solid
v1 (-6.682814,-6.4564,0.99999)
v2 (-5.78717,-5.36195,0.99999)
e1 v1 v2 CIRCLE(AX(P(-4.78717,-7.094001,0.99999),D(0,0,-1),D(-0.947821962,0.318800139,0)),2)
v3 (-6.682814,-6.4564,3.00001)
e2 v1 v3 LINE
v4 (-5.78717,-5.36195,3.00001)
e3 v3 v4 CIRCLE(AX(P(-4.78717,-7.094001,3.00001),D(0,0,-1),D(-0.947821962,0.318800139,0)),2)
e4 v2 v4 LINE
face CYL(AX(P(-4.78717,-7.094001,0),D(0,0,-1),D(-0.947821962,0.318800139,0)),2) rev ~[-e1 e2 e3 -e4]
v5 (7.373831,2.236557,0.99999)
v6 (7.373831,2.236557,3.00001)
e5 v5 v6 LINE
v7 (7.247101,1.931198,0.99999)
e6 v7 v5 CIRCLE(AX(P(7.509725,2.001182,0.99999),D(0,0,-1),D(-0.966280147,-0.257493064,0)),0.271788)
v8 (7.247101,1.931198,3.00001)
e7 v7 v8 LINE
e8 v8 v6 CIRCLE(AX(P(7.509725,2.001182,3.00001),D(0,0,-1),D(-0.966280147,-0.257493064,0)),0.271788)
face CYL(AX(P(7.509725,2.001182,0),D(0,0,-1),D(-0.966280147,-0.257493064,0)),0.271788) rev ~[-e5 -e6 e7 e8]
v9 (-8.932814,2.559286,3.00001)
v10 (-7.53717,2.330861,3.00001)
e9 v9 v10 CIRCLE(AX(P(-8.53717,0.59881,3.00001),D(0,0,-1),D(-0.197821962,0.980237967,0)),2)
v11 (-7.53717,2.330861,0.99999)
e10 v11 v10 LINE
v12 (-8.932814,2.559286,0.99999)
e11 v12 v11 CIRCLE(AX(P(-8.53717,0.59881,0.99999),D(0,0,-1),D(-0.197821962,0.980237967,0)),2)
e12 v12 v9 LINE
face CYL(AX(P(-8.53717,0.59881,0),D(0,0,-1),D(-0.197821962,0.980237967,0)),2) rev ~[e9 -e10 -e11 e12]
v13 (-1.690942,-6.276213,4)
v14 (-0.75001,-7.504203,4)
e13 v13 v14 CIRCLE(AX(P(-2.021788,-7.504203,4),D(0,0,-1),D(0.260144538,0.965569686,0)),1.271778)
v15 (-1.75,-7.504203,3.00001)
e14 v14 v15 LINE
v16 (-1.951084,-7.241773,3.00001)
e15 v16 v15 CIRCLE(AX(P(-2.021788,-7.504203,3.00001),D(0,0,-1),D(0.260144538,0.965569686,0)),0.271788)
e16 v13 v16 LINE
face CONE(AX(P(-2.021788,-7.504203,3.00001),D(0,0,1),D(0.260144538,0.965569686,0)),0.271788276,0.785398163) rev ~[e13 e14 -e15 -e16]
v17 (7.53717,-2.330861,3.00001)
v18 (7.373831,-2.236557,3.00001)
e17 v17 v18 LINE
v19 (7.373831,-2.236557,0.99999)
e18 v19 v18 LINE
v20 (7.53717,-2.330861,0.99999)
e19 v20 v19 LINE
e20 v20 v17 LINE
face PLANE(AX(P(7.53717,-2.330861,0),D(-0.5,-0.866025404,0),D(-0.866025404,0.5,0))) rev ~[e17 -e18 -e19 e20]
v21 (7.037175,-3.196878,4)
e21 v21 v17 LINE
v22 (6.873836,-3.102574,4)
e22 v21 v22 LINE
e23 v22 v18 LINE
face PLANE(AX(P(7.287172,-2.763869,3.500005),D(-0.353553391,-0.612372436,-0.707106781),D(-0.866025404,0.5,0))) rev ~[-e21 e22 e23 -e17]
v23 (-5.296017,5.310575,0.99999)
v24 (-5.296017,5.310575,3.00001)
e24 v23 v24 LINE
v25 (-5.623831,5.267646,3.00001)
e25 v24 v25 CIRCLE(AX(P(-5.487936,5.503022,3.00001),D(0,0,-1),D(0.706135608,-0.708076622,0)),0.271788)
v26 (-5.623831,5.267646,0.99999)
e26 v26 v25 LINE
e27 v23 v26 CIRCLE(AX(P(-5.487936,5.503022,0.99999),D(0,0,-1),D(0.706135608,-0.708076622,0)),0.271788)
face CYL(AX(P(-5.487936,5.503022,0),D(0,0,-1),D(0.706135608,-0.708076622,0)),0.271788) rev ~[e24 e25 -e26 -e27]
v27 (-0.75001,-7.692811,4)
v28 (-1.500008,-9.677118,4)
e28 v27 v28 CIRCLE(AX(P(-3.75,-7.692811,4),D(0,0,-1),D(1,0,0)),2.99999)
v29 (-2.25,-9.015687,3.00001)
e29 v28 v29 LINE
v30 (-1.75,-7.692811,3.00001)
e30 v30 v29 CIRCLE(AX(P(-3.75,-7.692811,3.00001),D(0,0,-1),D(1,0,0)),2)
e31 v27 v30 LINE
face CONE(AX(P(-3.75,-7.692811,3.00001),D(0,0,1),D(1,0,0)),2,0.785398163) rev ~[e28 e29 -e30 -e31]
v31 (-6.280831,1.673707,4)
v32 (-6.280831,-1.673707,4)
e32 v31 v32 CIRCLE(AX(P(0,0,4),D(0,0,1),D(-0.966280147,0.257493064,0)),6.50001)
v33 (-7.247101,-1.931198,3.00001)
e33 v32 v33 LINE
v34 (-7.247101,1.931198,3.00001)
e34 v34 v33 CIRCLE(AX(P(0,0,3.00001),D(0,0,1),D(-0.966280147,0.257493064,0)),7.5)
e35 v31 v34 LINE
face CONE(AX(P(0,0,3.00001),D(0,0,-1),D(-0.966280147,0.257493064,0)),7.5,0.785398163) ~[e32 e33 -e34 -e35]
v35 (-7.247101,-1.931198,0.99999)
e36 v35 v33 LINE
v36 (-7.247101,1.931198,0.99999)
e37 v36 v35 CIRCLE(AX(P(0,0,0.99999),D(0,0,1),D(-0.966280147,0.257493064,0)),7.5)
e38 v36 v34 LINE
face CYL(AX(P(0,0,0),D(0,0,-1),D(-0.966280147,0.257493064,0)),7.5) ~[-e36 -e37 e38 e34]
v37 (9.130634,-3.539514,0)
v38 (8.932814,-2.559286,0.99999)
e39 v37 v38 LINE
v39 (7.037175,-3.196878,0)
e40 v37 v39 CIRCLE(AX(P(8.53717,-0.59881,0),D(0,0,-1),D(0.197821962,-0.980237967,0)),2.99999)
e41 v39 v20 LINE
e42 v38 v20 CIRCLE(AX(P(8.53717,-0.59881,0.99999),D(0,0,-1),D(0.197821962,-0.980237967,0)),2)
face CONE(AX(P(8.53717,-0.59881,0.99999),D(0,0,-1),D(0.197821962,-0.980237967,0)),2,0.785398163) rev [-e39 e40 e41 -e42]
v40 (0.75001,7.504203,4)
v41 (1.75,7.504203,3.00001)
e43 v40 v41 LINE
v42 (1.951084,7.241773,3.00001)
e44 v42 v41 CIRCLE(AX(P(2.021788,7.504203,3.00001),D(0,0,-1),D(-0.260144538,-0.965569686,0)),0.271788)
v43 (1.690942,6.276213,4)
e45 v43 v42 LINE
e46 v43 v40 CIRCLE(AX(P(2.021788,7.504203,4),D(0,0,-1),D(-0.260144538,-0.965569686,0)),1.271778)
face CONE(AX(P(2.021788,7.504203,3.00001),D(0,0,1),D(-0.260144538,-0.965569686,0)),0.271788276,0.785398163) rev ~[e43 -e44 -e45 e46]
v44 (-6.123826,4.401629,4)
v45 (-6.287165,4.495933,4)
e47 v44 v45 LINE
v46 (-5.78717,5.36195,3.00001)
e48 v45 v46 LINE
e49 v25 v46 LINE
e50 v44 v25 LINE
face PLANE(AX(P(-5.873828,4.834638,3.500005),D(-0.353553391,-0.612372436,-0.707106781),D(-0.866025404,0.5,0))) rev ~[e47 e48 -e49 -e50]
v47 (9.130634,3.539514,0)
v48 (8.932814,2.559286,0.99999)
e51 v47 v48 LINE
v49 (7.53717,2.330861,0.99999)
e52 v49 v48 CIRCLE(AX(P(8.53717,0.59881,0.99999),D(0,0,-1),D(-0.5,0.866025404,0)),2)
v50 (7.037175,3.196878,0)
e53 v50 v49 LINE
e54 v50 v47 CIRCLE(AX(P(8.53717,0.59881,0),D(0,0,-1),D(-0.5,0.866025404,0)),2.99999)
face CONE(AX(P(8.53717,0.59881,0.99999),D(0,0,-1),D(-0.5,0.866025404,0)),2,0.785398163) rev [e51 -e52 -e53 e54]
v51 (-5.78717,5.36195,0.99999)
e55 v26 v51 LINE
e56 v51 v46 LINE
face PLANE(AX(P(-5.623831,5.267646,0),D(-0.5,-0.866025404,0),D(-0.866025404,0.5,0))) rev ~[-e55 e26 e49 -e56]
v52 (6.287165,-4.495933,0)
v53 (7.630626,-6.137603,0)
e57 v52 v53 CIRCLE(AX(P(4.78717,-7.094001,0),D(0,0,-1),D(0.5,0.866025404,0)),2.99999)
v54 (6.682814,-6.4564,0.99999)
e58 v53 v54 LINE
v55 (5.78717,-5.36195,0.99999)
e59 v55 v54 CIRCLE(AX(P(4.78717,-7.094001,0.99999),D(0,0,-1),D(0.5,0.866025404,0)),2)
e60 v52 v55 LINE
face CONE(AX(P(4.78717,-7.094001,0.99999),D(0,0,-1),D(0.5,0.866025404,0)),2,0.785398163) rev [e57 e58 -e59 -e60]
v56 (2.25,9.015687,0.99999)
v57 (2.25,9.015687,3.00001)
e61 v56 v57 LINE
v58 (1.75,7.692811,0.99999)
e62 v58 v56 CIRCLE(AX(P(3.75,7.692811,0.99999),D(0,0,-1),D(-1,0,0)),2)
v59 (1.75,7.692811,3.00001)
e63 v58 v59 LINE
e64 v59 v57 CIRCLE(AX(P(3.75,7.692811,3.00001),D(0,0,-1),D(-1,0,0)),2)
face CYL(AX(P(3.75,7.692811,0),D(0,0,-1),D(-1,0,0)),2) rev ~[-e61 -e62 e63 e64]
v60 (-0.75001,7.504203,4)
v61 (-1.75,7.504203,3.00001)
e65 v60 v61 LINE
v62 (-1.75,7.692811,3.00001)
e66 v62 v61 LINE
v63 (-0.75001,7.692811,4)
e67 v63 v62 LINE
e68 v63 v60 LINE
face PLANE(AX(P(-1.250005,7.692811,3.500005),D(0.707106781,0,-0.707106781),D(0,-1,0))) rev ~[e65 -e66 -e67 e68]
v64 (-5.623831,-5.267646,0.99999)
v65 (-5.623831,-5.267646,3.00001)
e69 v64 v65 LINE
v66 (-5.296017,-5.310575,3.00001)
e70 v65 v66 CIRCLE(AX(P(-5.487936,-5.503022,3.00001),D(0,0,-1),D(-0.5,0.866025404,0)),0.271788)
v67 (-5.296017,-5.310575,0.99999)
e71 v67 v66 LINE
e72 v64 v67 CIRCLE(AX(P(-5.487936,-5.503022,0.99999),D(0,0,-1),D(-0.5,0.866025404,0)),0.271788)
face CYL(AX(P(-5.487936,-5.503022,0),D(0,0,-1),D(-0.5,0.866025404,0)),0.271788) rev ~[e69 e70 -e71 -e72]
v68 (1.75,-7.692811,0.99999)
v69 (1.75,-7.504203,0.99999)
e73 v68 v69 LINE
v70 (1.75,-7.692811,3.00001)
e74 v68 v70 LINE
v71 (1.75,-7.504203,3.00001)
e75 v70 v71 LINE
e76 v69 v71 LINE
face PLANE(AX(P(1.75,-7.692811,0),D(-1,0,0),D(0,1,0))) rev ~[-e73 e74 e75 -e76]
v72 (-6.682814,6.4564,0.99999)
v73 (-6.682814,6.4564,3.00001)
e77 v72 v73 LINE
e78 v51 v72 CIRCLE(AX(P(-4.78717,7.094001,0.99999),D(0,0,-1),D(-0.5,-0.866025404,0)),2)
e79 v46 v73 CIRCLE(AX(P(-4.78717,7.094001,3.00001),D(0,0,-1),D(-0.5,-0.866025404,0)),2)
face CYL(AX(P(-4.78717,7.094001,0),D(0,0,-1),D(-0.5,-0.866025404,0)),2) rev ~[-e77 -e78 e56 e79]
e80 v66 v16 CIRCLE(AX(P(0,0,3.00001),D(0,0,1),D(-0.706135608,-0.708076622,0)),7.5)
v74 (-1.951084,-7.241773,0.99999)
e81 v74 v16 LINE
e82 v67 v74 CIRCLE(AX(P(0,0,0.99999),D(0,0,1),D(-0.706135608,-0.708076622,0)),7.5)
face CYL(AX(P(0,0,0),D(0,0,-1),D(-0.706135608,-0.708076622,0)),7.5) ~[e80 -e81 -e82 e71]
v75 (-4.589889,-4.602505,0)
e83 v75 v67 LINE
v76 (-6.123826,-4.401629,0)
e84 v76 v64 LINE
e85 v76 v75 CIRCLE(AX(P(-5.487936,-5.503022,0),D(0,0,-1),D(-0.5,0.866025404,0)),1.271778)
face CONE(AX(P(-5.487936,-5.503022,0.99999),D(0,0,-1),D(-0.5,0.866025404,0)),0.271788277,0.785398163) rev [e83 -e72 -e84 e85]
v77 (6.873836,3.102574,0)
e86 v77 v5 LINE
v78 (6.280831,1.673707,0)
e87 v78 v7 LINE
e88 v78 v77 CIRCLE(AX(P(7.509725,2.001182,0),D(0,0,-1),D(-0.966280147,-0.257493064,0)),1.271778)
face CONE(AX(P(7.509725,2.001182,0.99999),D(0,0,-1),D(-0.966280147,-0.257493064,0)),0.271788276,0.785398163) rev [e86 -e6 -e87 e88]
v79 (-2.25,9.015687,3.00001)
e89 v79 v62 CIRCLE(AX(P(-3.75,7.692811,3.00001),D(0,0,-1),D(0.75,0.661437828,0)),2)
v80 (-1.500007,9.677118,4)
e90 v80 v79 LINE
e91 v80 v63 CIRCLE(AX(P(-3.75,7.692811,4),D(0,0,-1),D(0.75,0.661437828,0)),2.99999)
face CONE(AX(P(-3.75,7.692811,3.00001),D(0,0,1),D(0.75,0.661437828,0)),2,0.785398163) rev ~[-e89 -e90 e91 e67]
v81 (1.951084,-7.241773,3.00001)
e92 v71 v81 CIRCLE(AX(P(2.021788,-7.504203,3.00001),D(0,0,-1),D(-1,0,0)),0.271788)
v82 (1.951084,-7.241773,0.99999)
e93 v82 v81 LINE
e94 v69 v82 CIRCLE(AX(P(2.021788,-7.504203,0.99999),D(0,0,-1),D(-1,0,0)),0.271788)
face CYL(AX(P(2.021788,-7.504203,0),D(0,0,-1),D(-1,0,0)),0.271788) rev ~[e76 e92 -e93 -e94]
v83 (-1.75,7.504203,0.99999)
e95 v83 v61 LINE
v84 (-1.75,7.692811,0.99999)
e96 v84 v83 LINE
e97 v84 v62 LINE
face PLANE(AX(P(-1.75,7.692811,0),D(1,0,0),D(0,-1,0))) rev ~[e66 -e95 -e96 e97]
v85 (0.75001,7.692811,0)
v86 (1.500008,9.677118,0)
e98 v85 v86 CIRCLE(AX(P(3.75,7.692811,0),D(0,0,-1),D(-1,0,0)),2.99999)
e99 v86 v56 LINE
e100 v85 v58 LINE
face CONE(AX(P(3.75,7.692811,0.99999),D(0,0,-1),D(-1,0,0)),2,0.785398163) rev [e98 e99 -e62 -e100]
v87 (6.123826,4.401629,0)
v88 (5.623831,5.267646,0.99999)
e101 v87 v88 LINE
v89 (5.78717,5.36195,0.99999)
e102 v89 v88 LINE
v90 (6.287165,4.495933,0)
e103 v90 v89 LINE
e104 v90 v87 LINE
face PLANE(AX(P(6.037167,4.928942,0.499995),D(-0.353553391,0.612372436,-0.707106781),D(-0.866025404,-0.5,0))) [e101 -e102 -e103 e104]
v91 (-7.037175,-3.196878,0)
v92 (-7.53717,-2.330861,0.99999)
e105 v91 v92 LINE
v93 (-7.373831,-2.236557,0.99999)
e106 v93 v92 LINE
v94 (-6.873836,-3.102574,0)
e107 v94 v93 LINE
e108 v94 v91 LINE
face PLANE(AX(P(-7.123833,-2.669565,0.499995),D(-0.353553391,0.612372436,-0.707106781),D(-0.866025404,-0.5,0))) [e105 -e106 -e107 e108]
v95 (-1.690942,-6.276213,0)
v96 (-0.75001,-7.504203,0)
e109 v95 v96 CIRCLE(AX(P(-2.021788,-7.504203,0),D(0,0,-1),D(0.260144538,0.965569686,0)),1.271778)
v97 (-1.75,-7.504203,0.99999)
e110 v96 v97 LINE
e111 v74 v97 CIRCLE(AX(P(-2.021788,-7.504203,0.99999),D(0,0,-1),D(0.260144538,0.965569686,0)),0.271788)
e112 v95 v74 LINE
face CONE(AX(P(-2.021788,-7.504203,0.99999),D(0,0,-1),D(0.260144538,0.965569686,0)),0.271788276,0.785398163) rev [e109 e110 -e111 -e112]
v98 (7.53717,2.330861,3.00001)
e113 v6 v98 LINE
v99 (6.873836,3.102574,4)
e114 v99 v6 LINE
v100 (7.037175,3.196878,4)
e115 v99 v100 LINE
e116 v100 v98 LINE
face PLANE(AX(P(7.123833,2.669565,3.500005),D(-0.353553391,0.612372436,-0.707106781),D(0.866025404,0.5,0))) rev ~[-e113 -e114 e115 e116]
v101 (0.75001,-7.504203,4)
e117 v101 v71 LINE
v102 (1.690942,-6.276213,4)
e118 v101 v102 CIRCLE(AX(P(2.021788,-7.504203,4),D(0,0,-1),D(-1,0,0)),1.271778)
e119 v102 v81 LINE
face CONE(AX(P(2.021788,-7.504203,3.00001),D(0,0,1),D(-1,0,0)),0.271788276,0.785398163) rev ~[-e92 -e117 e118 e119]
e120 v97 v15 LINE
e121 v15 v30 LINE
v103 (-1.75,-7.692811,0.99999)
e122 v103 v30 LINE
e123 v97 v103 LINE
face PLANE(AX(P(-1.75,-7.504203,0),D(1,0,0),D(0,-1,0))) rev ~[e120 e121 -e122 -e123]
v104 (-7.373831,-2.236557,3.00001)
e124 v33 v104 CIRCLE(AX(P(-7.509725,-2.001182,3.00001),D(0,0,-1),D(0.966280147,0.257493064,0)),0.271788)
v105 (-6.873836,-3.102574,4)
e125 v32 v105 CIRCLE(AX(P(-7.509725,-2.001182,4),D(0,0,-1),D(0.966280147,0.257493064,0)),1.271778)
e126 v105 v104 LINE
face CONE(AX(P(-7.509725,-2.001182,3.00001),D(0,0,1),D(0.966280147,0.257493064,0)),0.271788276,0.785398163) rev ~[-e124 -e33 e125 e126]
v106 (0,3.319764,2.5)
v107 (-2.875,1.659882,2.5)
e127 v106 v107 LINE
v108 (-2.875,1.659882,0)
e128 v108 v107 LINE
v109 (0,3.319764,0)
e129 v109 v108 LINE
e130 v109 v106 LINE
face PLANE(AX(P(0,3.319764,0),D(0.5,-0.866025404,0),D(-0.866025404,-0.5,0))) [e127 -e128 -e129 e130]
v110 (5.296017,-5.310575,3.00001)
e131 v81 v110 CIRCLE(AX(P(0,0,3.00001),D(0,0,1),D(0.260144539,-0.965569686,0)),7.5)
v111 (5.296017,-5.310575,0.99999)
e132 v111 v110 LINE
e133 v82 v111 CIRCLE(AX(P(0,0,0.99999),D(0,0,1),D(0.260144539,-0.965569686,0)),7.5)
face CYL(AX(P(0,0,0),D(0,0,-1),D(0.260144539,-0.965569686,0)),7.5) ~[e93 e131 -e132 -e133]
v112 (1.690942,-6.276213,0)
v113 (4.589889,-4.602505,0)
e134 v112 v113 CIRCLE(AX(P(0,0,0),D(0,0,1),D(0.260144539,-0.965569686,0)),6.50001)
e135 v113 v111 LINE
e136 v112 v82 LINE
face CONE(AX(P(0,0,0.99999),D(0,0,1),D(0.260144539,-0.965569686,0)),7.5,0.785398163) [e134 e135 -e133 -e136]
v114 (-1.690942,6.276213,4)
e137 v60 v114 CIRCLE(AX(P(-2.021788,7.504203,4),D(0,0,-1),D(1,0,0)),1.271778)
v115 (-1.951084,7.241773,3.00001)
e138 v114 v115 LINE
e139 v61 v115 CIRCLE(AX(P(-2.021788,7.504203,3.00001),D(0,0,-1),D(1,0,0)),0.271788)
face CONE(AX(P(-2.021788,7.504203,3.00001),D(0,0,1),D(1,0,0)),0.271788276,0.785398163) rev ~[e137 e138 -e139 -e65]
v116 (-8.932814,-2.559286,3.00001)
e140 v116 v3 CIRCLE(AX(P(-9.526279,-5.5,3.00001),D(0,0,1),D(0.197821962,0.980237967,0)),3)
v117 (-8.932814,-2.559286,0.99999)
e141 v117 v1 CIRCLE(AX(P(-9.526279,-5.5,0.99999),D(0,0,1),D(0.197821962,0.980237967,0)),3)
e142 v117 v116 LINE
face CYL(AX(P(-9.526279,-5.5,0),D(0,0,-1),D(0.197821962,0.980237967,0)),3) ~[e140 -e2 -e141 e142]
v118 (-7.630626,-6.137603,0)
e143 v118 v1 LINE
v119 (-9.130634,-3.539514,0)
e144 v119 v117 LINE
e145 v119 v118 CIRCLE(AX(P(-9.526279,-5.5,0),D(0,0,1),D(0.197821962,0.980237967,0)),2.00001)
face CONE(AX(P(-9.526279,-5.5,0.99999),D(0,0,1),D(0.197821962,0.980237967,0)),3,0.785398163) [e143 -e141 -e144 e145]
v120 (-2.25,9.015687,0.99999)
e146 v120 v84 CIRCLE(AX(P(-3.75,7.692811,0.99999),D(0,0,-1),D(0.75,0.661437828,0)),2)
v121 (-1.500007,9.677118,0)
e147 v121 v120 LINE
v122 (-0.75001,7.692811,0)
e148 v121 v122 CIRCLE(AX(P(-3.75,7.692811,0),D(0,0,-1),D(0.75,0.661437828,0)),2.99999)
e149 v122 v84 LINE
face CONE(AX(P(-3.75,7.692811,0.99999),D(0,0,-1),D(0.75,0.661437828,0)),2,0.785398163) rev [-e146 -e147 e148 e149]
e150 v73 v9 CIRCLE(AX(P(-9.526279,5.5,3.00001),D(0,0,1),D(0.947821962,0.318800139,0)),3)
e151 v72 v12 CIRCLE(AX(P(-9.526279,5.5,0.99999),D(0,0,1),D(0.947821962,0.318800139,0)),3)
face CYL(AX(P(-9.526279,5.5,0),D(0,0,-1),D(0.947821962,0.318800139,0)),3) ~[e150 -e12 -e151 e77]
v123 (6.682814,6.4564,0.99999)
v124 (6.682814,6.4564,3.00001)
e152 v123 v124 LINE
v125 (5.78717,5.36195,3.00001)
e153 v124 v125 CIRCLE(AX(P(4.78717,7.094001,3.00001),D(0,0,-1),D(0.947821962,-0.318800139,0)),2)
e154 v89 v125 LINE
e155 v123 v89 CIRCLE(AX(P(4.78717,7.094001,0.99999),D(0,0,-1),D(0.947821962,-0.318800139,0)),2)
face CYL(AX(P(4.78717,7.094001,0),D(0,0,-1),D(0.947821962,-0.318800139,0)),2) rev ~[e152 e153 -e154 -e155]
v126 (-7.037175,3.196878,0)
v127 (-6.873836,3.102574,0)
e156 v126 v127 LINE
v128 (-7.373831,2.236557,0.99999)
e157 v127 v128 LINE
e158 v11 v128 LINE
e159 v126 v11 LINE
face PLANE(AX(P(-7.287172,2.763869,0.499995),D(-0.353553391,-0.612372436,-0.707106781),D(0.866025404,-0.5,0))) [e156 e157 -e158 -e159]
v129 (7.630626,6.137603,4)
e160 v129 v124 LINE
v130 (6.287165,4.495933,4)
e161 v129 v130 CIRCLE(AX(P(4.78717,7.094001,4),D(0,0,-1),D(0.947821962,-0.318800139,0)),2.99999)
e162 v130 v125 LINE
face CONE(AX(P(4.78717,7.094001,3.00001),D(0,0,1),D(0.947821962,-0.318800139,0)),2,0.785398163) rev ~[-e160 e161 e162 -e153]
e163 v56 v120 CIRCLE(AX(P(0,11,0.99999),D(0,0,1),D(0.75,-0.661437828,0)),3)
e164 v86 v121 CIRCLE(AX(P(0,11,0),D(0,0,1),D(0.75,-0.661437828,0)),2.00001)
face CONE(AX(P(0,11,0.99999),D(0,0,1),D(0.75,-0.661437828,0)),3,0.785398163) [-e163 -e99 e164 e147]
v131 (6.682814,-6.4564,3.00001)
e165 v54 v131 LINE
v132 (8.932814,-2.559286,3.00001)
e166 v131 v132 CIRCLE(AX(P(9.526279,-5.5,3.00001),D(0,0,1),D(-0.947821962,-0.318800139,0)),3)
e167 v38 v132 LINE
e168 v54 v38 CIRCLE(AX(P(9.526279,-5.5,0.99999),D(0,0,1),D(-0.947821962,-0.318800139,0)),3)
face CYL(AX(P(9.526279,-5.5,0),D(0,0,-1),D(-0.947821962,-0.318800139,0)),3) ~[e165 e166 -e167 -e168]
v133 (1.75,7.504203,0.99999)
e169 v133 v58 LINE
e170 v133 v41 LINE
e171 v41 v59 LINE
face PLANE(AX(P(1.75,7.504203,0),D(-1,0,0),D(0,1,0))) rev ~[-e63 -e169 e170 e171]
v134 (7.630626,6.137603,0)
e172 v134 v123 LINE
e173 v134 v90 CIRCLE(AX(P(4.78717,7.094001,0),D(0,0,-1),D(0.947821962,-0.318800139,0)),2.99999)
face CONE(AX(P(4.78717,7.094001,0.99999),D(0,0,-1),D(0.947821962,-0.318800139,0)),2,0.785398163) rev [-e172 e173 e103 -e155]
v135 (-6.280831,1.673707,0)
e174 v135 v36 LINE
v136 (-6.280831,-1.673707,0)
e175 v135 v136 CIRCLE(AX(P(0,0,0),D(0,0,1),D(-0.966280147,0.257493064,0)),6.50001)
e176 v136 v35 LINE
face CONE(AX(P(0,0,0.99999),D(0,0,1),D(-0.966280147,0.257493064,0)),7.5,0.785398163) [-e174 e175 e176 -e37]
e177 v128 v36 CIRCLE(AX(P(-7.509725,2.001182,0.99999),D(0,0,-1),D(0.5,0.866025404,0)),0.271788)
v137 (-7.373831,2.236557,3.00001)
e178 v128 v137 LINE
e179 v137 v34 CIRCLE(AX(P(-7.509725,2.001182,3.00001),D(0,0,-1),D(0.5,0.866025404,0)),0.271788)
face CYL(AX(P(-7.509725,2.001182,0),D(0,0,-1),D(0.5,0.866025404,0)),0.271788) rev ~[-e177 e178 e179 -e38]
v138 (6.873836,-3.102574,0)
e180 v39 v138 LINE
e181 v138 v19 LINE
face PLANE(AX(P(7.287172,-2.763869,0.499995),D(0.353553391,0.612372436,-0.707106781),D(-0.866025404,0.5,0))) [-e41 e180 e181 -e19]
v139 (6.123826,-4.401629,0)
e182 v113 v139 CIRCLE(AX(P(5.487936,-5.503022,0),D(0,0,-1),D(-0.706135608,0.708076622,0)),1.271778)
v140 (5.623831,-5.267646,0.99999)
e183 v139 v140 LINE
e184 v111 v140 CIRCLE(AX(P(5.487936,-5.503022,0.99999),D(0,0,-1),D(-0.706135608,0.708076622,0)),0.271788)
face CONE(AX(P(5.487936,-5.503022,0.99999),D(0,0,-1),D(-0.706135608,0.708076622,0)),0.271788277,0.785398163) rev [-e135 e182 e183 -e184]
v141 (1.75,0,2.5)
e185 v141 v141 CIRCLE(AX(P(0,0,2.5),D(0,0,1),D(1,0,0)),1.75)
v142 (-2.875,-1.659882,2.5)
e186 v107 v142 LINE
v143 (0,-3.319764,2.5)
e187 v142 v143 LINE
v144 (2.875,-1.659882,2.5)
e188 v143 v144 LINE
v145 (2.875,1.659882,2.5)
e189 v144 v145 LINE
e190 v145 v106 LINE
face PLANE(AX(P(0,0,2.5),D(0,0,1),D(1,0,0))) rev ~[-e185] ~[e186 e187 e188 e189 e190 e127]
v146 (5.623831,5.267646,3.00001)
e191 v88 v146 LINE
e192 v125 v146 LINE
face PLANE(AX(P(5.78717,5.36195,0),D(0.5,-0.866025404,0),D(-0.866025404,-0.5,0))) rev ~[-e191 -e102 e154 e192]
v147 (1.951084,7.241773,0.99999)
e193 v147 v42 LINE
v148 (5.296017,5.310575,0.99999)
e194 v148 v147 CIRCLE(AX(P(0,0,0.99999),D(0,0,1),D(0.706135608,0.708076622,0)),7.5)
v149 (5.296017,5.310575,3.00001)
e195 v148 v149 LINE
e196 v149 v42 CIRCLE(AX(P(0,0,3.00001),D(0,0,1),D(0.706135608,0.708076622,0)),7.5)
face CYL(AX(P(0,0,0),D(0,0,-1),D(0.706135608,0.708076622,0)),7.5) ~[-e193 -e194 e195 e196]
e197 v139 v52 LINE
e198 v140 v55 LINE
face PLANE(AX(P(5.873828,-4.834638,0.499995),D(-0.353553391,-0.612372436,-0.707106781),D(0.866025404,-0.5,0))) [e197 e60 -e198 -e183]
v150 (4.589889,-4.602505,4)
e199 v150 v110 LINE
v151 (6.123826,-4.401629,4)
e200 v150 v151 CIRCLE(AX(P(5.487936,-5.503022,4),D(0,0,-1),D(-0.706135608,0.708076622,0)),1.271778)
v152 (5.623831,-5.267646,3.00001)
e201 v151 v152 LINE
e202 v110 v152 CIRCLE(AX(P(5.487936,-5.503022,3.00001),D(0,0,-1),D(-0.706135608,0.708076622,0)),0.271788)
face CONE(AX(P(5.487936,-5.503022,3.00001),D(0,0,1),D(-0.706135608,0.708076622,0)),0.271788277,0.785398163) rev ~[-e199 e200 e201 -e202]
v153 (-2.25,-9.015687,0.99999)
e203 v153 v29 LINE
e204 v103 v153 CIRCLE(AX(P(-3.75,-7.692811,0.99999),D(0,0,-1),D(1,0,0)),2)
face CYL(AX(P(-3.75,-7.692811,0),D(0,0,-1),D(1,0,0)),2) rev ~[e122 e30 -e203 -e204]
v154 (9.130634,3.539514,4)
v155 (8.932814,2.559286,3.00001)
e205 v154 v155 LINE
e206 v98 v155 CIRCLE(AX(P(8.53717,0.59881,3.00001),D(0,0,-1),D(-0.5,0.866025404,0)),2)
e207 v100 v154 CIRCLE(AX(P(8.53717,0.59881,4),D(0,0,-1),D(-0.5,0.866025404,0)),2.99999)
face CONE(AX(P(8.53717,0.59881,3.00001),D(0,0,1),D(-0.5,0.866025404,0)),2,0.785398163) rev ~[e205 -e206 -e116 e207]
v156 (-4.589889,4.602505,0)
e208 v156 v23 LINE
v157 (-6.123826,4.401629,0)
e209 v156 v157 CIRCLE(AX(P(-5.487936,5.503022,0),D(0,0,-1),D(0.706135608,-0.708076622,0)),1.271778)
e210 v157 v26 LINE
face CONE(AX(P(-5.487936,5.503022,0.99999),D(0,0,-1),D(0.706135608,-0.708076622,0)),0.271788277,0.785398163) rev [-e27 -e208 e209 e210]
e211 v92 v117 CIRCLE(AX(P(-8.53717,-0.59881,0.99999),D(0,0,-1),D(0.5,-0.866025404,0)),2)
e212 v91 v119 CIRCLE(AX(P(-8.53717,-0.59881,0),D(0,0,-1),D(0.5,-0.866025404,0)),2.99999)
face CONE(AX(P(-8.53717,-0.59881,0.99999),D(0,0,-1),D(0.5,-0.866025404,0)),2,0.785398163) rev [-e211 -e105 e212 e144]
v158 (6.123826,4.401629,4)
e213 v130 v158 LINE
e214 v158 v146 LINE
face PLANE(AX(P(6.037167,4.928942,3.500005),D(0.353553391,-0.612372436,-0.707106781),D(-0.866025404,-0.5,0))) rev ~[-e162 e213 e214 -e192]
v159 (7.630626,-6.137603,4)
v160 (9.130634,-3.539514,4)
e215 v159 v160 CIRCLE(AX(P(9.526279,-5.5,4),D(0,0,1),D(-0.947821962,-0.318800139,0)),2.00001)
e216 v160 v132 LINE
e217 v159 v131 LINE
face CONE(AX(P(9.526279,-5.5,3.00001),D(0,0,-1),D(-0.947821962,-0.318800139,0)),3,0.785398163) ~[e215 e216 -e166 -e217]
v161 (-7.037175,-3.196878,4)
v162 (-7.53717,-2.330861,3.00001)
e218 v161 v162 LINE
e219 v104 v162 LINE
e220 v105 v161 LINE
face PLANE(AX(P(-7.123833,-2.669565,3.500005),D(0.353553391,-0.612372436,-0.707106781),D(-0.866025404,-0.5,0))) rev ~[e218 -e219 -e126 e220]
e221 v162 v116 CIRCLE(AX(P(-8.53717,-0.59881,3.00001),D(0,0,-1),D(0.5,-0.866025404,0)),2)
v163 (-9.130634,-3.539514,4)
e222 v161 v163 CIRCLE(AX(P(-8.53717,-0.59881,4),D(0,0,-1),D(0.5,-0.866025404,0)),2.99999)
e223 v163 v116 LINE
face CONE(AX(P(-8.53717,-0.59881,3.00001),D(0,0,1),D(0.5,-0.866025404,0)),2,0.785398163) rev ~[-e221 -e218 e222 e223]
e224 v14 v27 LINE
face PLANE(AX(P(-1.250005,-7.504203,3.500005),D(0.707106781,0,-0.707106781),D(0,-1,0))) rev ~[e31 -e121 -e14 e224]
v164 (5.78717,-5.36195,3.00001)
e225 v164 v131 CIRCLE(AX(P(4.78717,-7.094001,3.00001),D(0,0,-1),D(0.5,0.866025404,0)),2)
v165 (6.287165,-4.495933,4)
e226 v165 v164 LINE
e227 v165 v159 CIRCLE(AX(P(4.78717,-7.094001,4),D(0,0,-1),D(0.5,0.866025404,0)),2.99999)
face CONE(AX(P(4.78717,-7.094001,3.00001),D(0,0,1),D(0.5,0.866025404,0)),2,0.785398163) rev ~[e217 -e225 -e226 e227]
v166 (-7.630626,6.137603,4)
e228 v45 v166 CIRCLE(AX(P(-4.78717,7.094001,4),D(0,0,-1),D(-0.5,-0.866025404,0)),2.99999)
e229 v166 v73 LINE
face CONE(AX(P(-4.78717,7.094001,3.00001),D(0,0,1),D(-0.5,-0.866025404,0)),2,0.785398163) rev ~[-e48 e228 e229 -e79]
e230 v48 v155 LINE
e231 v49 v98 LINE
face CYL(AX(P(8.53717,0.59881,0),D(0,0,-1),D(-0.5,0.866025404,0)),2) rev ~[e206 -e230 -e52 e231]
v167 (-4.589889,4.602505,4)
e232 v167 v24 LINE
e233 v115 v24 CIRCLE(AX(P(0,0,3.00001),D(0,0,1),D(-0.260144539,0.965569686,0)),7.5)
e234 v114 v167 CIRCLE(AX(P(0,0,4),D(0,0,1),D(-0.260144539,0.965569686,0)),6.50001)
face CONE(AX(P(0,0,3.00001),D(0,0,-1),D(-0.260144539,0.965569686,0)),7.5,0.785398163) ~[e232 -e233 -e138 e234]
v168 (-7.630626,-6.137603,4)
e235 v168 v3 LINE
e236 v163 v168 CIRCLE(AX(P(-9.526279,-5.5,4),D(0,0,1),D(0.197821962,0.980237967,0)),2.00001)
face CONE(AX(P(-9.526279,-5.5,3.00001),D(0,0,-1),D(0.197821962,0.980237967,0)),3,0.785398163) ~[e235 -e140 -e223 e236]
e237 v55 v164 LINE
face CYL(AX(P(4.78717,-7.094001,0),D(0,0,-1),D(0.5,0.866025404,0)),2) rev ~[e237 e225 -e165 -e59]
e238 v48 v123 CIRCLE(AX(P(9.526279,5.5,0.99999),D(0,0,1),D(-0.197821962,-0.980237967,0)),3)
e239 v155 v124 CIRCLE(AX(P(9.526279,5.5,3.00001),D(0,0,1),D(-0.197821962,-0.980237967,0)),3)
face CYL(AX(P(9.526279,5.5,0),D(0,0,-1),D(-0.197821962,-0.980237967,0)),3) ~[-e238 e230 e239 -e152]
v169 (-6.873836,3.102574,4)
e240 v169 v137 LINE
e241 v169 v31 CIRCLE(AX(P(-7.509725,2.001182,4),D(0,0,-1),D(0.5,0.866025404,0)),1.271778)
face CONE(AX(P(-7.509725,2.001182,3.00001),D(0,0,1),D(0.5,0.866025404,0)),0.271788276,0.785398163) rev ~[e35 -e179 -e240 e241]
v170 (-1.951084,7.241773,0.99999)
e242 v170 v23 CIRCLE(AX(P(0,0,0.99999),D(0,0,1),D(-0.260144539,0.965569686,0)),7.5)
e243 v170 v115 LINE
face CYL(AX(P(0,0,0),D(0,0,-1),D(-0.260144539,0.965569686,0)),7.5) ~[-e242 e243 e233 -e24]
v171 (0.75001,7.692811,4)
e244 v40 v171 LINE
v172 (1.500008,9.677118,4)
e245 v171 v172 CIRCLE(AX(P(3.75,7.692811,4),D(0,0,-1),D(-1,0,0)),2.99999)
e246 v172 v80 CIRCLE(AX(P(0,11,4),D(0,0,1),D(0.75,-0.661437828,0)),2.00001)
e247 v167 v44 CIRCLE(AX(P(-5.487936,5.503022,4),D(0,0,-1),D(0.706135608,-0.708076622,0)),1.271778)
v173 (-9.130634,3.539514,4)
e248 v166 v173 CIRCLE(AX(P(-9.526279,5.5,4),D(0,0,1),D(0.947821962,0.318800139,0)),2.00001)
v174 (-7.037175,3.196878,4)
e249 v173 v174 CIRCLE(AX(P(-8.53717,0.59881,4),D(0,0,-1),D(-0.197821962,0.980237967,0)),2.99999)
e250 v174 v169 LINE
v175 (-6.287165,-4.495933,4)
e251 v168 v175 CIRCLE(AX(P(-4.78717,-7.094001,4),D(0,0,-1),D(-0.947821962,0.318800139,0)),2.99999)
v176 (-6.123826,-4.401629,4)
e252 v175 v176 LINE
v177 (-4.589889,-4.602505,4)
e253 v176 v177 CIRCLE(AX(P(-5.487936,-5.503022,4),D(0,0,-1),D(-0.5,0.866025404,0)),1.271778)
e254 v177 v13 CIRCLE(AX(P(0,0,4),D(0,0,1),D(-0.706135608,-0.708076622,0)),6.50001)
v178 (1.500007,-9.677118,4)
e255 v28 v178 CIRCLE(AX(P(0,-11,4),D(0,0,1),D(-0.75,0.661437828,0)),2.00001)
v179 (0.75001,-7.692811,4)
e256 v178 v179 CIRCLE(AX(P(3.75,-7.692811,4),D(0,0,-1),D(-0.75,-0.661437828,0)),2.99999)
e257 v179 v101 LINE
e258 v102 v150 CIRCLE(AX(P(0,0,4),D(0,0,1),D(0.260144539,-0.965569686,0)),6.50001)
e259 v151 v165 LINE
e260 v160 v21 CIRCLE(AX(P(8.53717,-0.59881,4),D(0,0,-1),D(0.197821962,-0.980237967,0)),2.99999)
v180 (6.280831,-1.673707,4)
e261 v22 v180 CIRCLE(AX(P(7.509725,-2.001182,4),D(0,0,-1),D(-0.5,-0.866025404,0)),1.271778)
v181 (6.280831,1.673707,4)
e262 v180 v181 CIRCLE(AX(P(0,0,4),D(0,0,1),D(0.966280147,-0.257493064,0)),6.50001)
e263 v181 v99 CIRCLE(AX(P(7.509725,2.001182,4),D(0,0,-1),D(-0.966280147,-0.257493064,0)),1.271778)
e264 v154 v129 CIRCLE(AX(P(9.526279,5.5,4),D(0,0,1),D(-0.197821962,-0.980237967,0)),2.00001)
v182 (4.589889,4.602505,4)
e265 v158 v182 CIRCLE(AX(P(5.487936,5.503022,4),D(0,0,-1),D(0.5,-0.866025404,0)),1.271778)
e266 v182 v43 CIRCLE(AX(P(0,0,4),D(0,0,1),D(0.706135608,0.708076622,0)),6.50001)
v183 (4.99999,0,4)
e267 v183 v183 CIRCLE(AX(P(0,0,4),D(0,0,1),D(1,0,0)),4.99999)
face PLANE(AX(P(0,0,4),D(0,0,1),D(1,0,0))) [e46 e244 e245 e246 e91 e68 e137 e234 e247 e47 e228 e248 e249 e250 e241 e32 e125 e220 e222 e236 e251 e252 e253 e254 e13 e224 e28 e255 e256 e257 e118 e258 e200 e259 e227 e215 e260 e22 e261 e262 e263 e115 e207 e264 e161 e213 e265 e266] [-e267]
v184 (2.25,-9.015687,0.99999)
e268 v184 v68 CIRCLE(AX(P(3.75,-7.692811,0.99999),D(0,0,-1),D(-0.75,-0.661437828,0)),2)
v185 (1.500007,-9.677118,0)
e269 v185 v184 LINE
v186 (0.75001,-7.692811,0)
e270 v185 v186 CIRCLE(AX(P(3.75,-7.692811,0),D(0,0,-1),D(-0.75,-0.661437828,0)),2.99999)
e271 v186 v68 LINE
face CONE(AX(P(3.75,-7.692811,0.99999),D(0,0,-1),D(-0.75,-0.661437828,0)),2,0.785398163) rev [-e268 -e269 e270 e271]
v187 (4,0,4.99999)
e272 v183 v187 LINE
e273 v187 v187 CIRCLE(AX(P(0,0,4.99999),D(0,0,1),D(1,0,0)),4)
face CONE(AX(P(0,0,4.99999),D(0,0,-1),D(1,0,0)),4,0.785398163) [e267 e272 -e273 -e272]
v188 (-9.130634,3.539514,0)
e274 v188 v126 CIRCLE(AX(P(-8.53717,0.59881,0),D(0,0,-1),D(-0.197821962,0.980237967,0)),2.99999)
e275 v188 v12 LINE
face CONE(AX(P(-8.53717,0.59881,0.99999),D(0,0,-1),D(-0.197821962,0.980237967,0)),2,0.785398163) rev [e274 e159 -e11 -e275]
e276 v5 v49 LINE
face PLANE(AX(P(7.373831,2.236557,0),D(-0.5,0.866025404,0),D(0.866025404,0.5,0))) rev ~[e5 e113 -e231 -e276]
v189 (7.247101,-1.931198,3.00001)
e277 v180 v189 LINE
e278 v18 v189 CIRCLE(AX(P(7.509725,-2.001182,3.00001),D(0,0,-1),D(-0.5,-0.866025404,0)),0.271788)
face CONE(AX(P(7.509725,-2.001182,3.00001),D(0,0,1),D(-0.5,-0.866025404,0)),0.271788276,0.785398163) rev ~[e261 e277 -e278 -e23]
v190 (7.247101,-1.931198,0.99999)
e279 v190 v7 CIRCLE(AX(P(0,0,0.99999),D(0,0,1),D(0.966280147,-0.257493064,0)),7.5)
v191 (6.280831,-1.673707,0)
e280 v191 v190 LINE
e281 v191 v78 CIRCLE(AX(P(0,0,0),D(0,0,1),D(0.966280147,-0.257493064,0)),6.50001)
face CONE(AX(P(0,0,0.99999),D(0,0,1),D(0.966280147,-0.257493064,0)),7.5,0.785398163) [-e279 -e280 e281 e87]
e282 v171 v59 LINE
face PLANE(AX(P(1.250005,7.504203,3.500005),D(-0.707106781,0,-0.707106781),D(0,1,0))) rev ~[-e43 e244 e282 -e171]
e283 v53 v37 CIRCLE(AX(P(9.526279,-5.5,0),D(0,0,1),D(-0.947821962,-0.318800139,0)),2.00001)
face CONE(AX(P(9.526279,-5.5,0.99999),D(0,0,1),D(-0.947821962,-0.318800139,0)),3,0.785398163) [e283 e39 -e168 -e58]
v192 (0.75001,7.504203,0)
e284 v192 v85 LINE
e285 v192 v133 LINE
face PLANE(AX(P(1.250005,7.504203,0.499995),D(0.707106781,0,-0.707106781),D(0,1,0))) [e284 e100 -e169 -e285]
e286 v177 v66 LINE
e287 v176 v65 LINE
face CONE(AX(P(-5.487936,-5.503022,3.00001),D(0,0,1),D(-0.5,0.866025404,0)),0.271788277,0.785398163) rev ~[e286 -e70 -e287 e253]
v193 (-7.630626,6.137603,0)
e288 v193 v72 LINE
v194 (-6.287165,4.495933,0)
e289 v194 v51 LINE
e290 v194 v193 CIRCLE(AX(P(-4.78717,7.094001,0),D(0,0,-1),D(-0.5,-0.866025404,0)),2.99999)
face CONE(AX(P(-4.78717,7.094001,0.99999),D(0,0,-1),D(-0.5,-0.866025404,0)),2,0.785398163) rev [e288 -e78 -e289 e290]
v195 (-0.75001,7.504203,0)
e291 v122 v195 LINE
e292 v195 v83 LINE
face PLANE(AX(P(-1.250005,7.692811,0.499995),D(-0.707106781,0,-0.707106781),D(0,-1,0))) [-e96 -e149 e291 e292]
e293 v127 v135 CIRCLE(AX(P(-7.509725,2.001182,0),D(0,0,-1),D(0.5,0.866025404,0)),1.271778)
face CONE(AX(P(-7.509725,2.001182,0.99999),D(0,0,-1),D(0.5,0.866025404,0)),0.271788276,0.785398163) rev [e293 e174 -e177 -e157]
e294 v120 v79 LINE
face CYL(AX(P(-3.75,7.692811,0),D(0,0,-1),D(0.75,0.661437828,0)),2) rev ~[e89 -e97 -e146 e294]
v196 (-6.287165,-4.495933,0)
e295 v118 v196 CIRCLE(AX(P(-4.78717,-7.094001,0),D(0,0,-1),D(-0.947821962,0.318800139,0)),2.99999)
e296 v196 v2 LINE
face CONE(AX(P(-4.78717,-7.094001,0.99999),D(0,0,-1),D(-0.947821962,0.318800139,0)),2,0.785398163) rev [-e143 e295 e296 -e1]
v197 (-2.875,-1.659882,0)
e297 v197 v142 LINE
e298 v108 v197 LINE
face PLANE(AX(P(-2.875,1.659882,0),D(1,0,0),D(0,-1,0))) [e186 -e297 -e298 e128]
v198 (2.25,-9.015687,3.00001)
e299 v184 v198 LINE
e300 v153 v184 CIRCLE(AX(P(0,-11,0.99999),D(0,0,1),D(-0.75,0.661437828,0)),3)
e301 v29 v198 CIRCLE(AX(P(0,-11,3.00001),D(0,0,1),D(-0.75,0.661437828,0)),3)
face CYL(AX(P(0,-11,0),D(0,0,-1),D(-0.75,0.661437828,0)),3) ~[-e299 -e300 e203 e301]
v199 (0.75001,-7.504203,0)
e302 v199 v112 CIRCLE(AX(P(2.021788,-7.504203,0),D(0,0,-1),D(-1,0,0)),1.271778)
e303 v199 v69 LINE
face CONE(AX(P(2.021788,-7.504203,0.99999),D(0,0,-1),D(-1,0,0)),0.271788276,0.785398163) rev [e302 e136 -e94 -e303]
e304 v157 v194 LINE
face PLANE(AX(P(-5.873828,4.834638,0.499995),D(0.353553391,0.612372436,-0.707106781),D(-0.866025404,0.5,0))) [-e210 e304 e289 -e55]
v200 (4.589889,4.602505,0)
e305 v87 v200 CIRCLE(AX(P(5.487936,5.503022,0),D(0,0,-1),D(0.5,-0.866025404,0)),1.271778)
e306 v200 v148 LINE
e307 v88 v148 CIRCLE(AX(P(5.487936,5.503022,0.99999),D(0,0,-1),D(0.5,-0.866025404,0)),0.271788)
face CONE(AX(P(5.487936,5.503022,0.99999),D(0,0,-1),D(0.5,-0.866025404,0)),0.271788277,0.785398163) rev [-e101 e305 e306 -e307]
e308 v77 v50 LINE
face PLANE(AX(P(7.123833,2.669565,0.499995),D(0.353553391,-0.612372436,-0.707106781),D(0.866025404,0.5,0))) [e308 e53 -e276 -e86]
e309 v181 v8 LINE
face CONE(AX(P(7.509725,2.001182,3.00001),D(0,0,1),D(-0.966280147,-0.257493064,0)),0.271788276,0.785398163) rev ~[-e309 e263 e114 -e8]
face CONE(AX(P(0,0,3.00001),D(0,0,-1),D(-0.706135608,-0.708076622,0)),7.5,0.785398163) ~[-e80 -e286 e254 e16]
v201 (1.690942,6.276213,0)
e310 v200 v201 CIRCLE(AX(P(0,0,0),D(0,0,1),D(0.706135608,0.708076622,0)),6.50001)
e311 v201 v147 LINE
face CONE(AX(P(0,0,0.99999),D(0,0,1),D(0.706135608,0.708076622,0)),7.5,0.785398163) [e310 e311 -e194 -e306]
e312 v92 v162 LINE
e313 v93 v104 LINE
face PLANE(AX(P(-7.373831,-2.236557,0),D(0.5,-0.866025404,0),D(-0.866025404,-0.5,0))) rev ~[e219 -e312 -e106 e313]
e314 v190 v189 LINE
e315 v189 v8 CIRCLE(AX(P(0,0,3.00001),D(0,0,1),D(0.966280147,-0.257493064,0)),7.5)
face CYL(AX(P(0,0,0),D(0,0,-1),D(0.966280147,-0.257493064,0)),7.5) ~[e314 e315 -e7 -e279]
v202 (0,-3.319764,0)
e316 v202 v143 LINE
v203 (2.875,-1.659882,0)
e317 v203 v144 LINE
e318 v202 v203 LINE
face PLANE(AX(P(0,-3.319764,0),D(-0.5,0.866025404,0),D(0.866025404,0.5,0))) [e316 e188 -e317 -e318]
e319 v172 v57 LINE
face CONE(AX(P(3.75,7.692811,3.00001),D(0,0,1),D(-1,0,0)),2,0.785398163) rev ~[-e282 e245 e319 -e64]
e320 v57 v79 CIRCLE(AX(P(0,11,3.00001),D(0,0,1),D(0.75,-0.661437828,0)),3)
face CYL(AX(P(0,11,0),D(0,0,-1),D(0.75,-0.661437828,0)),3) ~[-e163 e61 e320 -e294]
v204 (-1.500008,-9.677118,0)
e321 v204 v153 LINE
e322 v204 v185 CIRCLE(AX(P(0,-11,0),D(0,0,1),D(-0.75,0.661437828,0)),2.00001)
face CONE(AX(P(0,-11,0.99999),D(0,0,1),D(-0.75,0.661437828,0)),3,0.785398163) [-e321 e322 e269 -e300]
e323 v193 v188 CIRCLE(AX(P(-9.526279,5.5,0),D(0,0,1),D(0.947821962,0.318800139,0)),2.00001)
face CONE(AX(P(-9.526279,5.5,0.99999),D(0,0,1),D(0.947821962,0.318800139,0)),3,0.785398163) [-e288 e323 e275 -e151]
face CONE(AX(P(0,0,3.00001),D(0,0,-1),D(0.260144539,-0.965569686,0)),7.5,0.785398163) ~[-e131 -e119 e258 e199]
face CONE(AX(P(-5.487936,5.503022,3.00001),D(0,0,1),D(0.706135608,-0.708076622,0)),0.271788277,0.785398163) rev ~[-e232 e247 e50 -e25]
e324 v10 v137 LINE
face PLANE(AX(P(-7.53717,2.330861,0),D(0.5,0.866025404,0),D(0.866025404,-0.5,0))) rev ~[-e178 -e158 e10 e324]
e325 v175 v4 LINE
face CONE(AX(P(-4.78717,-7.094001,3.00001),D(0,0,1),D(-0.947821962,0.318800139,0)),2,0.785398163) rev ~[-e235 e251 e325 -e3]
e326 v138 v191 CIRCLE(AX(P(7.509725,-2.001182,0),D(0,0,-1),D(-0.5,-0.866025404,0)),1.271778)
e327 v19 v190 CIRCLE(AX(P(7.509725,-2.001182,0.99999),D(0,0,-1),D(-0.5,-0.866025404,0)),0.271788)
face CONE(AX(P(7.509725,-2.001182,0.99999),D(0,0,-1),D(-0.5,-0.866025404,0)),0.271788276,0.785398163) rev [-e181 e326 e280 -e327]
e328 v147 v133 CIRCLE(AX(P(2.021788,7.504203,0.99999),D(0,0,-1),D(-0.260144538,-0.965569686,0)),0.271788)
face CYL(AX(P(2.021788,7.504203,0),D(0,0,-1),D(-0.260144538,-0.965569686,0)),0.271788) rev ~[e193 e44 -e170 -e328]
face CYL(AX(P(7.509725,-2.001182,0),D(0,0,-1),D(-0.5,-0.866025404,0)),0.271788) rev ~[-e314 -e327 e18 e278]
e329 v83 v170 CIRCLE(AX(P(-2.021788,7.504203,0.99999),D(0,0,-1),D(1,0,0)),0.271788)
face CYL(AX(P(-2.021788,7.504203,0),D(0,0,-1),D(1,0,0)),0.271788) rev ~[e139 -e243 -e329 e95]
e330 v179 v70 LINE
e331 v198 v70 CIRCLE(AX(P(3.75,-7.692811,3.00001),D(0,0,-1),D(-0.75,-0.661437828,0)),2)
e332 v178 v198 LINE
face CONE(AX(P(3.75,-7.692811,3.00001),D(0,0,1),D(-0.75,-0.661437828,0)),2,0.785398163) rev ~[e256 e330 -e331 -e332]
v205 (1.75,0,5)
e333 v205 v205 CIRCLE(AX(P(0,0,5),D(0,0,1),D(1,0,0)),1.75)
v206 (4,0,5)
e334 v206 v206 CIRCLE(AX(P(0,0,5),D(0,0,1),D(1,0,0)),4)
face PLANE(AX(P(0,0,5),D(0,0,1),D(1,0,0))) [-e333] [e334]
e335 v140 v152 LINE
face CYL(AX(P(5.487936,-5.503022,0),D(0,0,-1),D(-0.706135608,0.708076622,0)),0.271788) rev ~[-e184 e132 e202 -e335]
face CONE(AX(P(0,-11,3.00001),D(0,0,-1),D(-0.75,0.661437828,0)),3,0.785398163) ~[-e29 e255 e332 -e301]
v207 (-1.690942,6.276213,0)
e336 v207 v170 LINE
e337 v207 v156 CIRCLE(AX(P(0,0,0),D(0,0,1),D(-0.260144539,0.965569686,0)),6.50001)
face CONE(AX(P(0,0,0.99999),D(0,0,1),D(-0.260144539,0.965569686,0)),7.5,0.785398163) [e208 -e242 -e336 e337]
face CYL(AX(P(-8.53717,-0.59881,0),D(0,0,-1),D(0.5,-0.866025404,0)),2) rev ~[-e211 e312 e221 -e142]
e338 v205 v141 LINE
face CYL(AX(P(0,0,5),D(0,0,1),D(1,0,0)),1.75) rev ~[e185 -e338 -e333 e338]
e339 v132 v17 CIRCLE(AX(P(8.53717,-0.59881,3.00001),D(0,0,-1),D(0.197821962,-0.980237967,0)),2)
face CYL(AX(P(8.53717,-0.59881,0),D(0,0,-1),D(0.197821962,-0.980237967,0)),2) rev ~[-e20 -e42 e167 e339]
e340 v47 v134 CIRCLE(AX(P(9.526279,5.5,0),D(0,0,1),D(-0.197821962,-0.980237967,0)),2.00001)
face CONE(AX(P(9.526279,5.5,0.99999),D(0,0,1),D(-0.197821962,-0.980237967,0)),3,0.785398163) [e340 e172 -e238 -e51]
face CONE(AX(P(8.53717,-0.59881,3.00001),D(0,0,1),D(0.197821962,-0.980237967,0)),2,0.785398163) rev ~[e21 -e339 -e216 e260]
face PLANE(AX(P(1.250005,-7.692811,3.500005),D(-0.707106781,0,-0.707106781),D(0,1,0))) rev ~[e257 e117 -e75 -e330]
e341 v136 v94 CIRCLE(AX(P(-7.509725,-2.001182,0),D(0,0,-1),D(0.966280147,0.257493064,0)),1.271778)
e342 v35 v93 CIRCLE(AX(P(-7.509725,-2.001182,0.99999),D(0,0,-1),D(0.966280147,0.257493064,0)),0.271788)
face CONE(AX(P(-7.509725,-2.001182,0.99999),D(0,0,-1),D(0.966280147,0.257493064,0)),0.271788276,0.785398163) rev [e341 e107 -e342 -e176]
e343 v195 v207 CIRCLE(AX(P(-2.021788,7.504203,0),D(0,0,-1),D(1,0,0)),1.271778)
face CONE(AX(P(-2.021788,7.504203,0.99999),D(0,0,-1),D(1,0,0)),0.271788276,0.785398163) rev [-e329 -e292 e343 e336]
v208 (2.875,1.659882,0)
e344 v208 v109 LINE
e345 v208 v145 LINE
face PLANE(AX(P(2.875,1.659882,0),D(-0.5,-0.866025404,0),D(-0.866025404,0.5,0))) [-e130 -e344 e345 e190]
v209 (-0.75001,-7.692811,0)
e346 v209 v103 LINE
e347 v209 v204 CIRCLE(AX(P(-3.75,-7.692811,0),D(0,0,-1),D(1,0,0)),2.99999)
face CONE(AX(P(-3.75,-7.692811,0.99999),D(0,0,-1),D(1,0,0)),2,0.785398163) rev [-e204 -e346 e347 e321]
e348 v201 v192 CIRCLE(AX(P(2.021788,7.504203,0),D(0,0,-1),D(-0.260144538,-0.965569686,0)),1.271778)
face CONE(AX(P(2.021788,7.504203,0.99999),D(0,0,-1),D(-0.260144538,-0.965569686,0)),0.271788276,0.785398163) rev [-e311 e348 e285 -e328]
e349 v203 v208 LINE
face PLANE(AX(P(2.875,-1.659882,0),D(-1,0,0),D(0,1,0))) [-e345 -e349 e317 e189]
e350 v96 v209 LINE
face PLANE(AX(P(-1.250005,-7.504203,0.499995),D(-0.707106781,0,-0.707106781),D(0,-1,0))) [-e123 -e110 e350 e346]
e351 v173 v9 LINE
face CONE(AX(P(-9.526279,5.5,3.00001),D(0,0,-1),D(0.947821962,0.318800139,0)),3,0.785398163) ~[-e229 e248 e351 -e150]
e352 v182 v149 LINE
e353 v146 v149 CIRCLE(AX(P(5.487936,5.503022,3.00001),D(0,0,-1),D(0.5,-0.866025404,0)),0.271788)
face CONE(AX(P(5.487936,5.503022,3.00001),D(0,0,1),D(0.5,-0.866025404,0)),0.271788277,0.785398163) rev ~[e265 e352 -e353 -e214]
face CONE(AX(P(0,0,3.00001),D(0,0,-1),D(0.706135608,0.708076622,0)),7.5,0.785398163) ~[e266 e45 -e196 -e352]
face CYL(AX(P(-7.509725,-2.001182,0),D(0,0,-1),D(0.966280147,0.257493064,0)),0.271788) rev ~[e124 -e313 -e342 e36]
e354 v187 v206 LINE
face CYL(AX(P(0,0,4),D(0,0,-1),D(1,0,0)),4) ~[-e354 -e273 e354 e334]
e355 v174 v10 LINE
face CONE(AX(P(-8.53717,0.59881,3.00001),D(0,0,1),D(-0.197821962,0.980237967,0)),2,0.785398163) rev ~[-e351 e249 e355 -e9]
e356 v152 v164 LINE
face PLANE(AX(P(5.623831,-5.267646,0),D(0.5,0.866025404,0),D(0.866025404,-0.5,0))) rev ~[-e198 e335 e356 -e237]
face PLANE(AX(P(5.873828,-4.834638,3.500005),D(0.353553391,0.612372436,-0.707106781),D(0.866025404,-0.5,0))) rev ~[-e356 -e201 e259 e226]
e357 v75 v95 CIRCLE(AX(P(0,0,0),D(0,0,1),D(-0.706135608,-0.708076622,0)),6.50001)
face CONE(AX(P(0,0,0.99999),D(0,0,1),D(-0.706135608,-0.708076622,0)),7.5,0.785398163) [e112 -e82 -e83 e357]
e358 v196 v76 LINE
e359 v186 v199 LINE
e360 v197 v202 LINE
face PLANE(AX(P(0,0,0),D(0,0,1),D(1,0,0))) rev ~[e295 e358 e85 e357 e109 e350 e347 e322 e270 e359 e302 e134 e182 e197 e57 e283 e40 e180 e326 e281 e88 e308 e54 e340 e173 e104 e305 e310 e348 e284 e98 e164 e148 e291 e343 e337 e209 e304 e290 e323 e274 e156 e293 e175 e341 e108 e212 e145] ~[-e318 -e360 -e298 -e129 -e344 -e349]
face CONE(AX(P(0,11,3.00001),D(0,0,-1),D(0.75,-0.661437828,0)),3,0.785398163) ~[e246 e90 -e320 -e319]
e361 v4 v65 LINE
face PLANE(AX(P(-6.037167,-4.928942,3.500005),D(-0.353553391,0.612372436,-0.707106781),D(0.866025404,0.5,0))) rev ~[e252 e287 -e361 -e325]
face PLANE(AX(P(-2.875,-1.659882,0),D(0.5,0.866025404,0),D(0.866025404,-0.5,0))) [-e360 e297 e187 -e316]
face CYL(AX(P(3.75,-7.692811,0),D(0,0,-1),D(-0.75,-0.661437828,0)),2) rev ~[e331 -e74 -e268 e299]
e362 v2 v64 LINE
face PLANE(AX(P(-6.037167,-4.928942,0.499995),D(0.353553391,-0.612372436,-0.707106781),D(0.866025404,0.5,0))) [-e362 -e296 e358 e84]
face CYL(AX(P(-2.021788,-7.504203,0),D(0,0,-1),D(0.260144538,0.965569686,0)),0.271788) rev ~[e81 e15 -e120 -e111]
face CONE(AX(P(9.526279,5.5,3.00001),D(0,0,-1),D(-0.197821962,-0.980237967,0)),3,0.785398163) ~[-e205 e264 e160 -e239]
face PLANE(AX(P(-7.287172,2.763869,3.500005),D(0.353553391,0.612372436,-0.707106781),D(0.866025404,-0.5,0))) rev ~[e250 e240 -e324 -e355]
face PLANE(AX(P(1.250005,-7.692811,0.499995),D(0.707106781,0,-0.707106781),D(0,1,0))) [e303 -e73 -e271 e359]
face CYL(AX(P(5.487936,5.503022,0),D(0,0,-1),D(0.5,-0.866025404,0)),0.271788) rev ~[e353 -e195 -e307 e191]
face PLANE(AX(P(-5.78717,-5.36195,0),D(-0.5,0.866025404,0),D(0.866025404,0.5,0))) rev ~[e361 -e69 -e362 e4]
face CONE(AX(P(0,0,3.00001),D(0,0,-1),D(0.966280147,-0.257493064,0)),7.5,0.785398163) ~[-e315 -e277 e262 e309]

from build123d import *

# Parameters (mm, degrees)
F1_DEPTH = 4
F3_DEPTH = 2.5
F4_R     = 4
F5_DEPTH = 1
F6_R     = 1.75
F7_DEPTH = 5.001
F8_SIZE  = 0.99999


# Not quite as in the source:
# - a fillet or chamfer is up to 0.001 mm smaller than in the source, because OpenCascade refuses the exact size


with BuildPart() as f1:
    # F0 (on Top) → F1 (new body)
    with BuildSketch(Plane.XY):
        with BuildLine():
            ThreePointArc((-1.75, 7.5042031676), (-1.8060506469, 7.3388969595), (-1.9510840407, 7.2417726467))
            ThreePointArc((-1.9510840407, 7.2417726467), (-3.75, 6.4951905284), (-5.2960170601, 5.3105746675))
            ThreePointArc((-5.2960170601, 5.3105746675), (-5.4526458792, 5.2335342205), (-5.6238305783, 5.2676460404))
            Line((-5.6238305783, 5.2676460404), (-5.7871696323, 5.3619498872))
            ThreePointArc((-5.7871696323, 5.3619498872), (-6.3349564147, 5.8273689108), (-6.682813556, 6.4564004169))
            ThreePointArc((-6.682813556, 6.4564004169), (-12.124355653, 7), (-8.932813556, 2.5592860998))
            ThreePointArc((-8.932813556, 2.5592860998), (-8.2141277213, 2.5725487316), (-7.5371696323, 2.330860974))
            Line((-7.5371696323, 2.330860974), (-7.3738305783, 2.2365571272))
            ThreePointArc((-7.3738305783, 2.2365571272), (-7.2586965261, 2.105362739), (-7.2471011008, 1.9311979792))
            ThreePointArc((-7.2471011008, 1.9311979792), (-7.5, 0), (-7.2471011008, -1.9311979792))
            ThreePointArc((-7.2471011008, -1.9311979792), (-7.2586965261, -2.105362739), (-7.3738305783, -2.2365571272))
            Line((-7.3738305783, -2.2365571272), (-7.5371696323, -2.330860974))
            ThreePointArc((-7.5371696323, -2.330860974), (-8.2141277213, -2.5725487316), (-8.932813556, -2.5592860998))
            ThreePointArc((-8.932813556, -2.5592860998), (-12.124355653, -7), (-6.682813556, -6.4564004169))
            ThreePointArc((-6.682813556, -6.4564004169), (-6.3349564147, -5.8273689108), (-5.7871696323, -5.3619498872))
            Line((-5.7871696323, -5.3619498872), (-5.6238305783, -5.2676460404))
            ThreePointArc((-5.6238305783, -5.2676460404), (-5.4526458792, -5.2335342205), (-5.2960170601, -5.3105746675))
            ThreePointArc((-5.2960170601, -5.3105746675), (-3.75, -6.4951905284), (-1.9510840407, -7.2417726467))
            ThreePointArc((-1.9510840407, -7.2417726467), (-1.8060506469, -7.3388969595), (-1.75, -7.5042031676))
            Line((-1.75, -7.5042031676), (-1.75, -7.6928108612))
            ThreePointArc((-1.75, -7.6928108612), (-1.8791713066, -8.3999176424), (-2.25, -9.0156865167))
            ThreePointArc((-2.25, -9.0156865167), (0, -14), (2.25, -9.0156865167))
            ThreePointArc((2.25, -9.0156865167), (1.8791713066, -8.3999176424), (1.75, -7.6928108612))
            Line((1.75, -7.6928108612), (1.75, -7.5042031676))
            ThreePointArc((1.75, -7.5042031676), (1.8060506469, -7.3388969595), (1.9510840407, -7.2417726467))
            ThreePointArc((1.9510840407, -7.2417726467), (3.75, -6.4951905284), (5.2960170601, -5.3105746675))
            ThreePointArc((5.2960170601, -5.3105746675), (5.4526458792, -5.2335342205), (5.6238305783, -5.2676460404))
            Line((5.6238305783, -5.2676460404), (5.7871696323, -5.3619498872))
            ThreePointArc((5.7871696323, -5.3619498872), (6.3349564147, -5.8273689108), (6.682813556, -6.4564004169))
            ThreePointArc((6.682813556, -6.4564004169), (12.124355653, -7), (8.932813556, -2.5592860998))
            ThreePointArc((8.932813556, -2.5592860998), (8.2141277213, -2.5725487316), (7.5371696323, -2.330860974))
            Line((7.5371696323, -2.330860974), (7.3738305783, -2.2365571272))
            ThreePointArc((7.3738305783, -2.2365571272), (7.2586965261, -2.105362739), (7.2471011008, -1.9311979792))
            ThreePointArc((7.2471011008, -1.9311979792), (7.5, 0), (7.2471011008, 1.9311979792))
            ThreePointArc((7.2471011008, 1.9311979792), (7.2586965261, 2.105362739), (7.3738305783, 2.2365571272))
            Line((7.3738305783, 2.2365571272), (7.5371696323, 2.330860974))
            ThreePointArc((7.5371696323, 2.330860974), (8.2141277213, 2.5725487316), (8.932813556, 2.5592860998))
            ThreePointArc((8.932813556, 2.5592860998), (12.124355653, 7), (6.682813556, 6.4564004169))
            ThreePointArc((6.682813556, 6.4564004169), (6.3349564147, 5.8273689108), (5.7871696323, 5.3619498872))
            Line((5.7871696323, 5.3619498872), (5.6238305783, 5.2676460404))
            ThreePointArc((5.6238305783, 5.2676460404), (5.4526458792, 5.2335342205), (5.2960170601, 5.3105746675))
            ThreePointArc((5.2960170601, 5.3105746675), (3.75, 6.4951905284), (1.9510840407, 7.2417726467))
            ThreePointArc((1.9510840407, 7.2417726467), (1.8060506469, 7.3388969595), (1.75, 7.5042031676))
            Line((1.75, 7.5042031676), (1.75, 7.6928108612))
            ThreePointArc((1.75, 7.6928108612), (1.8791713066, 8.3999176424), (2.25, 9.0156865167))
            ThreePointArc((2.25, 9.0156865167), (0, 14), (-2.25, 9.0156865167))
            ThreePointArc((-2.25, 9.0156865167), (-1.8791713066, 8.3999176424), (-1.75, 7.6928108612))
            Line((-1.75, 7.6928108612), (-1.75, 7.5042031676))
        make_face()
    extrude(amount=F1_DEPTH)

    # F2 (on Top) → F3 (cut)
    with BuildSketch(Plane.XY):
        Polygon((2.875, -1.6598820239), (2.875, 1.6598820239), (0, 3.3197640478), (-2.875, 1.6598820239), (-2.875, -1.6598820239), (0, -3.3197640478), align=None)
    extrude(amount=F3_DEPTH, mode=Mode.SUBTRACT)

    # F4 (on face) → F5 (join)
    with BuildSketch(Plane.XY.offset(4)):
        Circle(F4_R)
    extrude(amount=F5_DEPTH)

    # F6 (on face) → F7 (cut, through all)
    with BuildSketch(Plane.XY.offset(5)):
        Circle(F6_R)
    extrude(amount=-F7_DEPTH, mode=Mode.SUBTRACT)

    # F8 (size 1 in the source; OpenCascade refuses exactly that, so slightly less here)
    f8_edges = [f1.edges().sort_by_distance(p)[0] for p in [
        (1.75, -7.598507, 4),
        (1.879171, -8.399918, 4),
        (1.806051, -7.338897, 4),
        (0, -14, 4),
        (3.75, -6.495191, 4),
        (-1.879171, -8.399918, 4),
        (5.452646, -5.233534, 4),
        (-1.75, -7.598507, 4),
        (5.7055, -5.314798, 4),
        (-1.806051, -7.338897, 4),
        (6.334956, -5.827369, 4),
        (-3.75, -6.495191, 4),
        (12.124356, -7, 4),
        (-5.452646, -5.233534, 4),
        (8.214128, -2.572549, 4),
        (-5.7055, -5.314798, 4),
        (7.4555, -2.283709, 4),
        (-6.334956, -5.827369, 4),
        (7.258697, -2.105363, 4),
        (-12.124356, -7, 4),
        (7.5, 0, 4),
        (-8.214128, -2.572549, 4),
        (7.258697, 2.105363, 4),
        (-7.4555, -2.283709, 4),
        (7.4555, 2.283709, 4),
        (-7.258697, -2.105363, 4),
        (8.214128, 2.572549, 4),
        (-7.5, 0, 4),
        (12.124356, 7, 4),
        (-7.258697, 2.105363, 4),
        (6.334956, 5.827369, 4),
        (-7.4555, 2.283709, 4),
        (5.7055, 5.314798, 4),
        (-8.214128, 2.572549, 4),
        (5.452646, 5.233534, 4),
        (-12.124356, 7, 4),
        (3.75, 6.495191, 4),
        (-6.334956, 5.827369, 4),
        (1.806051, 7.338897, 4),
        (-5.7055, 5.314798, 4),
        (1.75, 7.598507, 4),
        (-5.452646, 5.233534, 4),
        (1.879171, 8.399918, 4),
        (-3.75, 6.495191, 4),
        (0, 14, 4),
        (-1.806051, 7.338897, 4),
        (-1.879171, 8.399918, 4),
        (-1.75, 7.598507, 4),
        (-4, 0, 4),
        (-12.124356, -7, 0),
    ]]
    chamfer(f8_edges, length=F8_SIZE)


solid = f1.part
